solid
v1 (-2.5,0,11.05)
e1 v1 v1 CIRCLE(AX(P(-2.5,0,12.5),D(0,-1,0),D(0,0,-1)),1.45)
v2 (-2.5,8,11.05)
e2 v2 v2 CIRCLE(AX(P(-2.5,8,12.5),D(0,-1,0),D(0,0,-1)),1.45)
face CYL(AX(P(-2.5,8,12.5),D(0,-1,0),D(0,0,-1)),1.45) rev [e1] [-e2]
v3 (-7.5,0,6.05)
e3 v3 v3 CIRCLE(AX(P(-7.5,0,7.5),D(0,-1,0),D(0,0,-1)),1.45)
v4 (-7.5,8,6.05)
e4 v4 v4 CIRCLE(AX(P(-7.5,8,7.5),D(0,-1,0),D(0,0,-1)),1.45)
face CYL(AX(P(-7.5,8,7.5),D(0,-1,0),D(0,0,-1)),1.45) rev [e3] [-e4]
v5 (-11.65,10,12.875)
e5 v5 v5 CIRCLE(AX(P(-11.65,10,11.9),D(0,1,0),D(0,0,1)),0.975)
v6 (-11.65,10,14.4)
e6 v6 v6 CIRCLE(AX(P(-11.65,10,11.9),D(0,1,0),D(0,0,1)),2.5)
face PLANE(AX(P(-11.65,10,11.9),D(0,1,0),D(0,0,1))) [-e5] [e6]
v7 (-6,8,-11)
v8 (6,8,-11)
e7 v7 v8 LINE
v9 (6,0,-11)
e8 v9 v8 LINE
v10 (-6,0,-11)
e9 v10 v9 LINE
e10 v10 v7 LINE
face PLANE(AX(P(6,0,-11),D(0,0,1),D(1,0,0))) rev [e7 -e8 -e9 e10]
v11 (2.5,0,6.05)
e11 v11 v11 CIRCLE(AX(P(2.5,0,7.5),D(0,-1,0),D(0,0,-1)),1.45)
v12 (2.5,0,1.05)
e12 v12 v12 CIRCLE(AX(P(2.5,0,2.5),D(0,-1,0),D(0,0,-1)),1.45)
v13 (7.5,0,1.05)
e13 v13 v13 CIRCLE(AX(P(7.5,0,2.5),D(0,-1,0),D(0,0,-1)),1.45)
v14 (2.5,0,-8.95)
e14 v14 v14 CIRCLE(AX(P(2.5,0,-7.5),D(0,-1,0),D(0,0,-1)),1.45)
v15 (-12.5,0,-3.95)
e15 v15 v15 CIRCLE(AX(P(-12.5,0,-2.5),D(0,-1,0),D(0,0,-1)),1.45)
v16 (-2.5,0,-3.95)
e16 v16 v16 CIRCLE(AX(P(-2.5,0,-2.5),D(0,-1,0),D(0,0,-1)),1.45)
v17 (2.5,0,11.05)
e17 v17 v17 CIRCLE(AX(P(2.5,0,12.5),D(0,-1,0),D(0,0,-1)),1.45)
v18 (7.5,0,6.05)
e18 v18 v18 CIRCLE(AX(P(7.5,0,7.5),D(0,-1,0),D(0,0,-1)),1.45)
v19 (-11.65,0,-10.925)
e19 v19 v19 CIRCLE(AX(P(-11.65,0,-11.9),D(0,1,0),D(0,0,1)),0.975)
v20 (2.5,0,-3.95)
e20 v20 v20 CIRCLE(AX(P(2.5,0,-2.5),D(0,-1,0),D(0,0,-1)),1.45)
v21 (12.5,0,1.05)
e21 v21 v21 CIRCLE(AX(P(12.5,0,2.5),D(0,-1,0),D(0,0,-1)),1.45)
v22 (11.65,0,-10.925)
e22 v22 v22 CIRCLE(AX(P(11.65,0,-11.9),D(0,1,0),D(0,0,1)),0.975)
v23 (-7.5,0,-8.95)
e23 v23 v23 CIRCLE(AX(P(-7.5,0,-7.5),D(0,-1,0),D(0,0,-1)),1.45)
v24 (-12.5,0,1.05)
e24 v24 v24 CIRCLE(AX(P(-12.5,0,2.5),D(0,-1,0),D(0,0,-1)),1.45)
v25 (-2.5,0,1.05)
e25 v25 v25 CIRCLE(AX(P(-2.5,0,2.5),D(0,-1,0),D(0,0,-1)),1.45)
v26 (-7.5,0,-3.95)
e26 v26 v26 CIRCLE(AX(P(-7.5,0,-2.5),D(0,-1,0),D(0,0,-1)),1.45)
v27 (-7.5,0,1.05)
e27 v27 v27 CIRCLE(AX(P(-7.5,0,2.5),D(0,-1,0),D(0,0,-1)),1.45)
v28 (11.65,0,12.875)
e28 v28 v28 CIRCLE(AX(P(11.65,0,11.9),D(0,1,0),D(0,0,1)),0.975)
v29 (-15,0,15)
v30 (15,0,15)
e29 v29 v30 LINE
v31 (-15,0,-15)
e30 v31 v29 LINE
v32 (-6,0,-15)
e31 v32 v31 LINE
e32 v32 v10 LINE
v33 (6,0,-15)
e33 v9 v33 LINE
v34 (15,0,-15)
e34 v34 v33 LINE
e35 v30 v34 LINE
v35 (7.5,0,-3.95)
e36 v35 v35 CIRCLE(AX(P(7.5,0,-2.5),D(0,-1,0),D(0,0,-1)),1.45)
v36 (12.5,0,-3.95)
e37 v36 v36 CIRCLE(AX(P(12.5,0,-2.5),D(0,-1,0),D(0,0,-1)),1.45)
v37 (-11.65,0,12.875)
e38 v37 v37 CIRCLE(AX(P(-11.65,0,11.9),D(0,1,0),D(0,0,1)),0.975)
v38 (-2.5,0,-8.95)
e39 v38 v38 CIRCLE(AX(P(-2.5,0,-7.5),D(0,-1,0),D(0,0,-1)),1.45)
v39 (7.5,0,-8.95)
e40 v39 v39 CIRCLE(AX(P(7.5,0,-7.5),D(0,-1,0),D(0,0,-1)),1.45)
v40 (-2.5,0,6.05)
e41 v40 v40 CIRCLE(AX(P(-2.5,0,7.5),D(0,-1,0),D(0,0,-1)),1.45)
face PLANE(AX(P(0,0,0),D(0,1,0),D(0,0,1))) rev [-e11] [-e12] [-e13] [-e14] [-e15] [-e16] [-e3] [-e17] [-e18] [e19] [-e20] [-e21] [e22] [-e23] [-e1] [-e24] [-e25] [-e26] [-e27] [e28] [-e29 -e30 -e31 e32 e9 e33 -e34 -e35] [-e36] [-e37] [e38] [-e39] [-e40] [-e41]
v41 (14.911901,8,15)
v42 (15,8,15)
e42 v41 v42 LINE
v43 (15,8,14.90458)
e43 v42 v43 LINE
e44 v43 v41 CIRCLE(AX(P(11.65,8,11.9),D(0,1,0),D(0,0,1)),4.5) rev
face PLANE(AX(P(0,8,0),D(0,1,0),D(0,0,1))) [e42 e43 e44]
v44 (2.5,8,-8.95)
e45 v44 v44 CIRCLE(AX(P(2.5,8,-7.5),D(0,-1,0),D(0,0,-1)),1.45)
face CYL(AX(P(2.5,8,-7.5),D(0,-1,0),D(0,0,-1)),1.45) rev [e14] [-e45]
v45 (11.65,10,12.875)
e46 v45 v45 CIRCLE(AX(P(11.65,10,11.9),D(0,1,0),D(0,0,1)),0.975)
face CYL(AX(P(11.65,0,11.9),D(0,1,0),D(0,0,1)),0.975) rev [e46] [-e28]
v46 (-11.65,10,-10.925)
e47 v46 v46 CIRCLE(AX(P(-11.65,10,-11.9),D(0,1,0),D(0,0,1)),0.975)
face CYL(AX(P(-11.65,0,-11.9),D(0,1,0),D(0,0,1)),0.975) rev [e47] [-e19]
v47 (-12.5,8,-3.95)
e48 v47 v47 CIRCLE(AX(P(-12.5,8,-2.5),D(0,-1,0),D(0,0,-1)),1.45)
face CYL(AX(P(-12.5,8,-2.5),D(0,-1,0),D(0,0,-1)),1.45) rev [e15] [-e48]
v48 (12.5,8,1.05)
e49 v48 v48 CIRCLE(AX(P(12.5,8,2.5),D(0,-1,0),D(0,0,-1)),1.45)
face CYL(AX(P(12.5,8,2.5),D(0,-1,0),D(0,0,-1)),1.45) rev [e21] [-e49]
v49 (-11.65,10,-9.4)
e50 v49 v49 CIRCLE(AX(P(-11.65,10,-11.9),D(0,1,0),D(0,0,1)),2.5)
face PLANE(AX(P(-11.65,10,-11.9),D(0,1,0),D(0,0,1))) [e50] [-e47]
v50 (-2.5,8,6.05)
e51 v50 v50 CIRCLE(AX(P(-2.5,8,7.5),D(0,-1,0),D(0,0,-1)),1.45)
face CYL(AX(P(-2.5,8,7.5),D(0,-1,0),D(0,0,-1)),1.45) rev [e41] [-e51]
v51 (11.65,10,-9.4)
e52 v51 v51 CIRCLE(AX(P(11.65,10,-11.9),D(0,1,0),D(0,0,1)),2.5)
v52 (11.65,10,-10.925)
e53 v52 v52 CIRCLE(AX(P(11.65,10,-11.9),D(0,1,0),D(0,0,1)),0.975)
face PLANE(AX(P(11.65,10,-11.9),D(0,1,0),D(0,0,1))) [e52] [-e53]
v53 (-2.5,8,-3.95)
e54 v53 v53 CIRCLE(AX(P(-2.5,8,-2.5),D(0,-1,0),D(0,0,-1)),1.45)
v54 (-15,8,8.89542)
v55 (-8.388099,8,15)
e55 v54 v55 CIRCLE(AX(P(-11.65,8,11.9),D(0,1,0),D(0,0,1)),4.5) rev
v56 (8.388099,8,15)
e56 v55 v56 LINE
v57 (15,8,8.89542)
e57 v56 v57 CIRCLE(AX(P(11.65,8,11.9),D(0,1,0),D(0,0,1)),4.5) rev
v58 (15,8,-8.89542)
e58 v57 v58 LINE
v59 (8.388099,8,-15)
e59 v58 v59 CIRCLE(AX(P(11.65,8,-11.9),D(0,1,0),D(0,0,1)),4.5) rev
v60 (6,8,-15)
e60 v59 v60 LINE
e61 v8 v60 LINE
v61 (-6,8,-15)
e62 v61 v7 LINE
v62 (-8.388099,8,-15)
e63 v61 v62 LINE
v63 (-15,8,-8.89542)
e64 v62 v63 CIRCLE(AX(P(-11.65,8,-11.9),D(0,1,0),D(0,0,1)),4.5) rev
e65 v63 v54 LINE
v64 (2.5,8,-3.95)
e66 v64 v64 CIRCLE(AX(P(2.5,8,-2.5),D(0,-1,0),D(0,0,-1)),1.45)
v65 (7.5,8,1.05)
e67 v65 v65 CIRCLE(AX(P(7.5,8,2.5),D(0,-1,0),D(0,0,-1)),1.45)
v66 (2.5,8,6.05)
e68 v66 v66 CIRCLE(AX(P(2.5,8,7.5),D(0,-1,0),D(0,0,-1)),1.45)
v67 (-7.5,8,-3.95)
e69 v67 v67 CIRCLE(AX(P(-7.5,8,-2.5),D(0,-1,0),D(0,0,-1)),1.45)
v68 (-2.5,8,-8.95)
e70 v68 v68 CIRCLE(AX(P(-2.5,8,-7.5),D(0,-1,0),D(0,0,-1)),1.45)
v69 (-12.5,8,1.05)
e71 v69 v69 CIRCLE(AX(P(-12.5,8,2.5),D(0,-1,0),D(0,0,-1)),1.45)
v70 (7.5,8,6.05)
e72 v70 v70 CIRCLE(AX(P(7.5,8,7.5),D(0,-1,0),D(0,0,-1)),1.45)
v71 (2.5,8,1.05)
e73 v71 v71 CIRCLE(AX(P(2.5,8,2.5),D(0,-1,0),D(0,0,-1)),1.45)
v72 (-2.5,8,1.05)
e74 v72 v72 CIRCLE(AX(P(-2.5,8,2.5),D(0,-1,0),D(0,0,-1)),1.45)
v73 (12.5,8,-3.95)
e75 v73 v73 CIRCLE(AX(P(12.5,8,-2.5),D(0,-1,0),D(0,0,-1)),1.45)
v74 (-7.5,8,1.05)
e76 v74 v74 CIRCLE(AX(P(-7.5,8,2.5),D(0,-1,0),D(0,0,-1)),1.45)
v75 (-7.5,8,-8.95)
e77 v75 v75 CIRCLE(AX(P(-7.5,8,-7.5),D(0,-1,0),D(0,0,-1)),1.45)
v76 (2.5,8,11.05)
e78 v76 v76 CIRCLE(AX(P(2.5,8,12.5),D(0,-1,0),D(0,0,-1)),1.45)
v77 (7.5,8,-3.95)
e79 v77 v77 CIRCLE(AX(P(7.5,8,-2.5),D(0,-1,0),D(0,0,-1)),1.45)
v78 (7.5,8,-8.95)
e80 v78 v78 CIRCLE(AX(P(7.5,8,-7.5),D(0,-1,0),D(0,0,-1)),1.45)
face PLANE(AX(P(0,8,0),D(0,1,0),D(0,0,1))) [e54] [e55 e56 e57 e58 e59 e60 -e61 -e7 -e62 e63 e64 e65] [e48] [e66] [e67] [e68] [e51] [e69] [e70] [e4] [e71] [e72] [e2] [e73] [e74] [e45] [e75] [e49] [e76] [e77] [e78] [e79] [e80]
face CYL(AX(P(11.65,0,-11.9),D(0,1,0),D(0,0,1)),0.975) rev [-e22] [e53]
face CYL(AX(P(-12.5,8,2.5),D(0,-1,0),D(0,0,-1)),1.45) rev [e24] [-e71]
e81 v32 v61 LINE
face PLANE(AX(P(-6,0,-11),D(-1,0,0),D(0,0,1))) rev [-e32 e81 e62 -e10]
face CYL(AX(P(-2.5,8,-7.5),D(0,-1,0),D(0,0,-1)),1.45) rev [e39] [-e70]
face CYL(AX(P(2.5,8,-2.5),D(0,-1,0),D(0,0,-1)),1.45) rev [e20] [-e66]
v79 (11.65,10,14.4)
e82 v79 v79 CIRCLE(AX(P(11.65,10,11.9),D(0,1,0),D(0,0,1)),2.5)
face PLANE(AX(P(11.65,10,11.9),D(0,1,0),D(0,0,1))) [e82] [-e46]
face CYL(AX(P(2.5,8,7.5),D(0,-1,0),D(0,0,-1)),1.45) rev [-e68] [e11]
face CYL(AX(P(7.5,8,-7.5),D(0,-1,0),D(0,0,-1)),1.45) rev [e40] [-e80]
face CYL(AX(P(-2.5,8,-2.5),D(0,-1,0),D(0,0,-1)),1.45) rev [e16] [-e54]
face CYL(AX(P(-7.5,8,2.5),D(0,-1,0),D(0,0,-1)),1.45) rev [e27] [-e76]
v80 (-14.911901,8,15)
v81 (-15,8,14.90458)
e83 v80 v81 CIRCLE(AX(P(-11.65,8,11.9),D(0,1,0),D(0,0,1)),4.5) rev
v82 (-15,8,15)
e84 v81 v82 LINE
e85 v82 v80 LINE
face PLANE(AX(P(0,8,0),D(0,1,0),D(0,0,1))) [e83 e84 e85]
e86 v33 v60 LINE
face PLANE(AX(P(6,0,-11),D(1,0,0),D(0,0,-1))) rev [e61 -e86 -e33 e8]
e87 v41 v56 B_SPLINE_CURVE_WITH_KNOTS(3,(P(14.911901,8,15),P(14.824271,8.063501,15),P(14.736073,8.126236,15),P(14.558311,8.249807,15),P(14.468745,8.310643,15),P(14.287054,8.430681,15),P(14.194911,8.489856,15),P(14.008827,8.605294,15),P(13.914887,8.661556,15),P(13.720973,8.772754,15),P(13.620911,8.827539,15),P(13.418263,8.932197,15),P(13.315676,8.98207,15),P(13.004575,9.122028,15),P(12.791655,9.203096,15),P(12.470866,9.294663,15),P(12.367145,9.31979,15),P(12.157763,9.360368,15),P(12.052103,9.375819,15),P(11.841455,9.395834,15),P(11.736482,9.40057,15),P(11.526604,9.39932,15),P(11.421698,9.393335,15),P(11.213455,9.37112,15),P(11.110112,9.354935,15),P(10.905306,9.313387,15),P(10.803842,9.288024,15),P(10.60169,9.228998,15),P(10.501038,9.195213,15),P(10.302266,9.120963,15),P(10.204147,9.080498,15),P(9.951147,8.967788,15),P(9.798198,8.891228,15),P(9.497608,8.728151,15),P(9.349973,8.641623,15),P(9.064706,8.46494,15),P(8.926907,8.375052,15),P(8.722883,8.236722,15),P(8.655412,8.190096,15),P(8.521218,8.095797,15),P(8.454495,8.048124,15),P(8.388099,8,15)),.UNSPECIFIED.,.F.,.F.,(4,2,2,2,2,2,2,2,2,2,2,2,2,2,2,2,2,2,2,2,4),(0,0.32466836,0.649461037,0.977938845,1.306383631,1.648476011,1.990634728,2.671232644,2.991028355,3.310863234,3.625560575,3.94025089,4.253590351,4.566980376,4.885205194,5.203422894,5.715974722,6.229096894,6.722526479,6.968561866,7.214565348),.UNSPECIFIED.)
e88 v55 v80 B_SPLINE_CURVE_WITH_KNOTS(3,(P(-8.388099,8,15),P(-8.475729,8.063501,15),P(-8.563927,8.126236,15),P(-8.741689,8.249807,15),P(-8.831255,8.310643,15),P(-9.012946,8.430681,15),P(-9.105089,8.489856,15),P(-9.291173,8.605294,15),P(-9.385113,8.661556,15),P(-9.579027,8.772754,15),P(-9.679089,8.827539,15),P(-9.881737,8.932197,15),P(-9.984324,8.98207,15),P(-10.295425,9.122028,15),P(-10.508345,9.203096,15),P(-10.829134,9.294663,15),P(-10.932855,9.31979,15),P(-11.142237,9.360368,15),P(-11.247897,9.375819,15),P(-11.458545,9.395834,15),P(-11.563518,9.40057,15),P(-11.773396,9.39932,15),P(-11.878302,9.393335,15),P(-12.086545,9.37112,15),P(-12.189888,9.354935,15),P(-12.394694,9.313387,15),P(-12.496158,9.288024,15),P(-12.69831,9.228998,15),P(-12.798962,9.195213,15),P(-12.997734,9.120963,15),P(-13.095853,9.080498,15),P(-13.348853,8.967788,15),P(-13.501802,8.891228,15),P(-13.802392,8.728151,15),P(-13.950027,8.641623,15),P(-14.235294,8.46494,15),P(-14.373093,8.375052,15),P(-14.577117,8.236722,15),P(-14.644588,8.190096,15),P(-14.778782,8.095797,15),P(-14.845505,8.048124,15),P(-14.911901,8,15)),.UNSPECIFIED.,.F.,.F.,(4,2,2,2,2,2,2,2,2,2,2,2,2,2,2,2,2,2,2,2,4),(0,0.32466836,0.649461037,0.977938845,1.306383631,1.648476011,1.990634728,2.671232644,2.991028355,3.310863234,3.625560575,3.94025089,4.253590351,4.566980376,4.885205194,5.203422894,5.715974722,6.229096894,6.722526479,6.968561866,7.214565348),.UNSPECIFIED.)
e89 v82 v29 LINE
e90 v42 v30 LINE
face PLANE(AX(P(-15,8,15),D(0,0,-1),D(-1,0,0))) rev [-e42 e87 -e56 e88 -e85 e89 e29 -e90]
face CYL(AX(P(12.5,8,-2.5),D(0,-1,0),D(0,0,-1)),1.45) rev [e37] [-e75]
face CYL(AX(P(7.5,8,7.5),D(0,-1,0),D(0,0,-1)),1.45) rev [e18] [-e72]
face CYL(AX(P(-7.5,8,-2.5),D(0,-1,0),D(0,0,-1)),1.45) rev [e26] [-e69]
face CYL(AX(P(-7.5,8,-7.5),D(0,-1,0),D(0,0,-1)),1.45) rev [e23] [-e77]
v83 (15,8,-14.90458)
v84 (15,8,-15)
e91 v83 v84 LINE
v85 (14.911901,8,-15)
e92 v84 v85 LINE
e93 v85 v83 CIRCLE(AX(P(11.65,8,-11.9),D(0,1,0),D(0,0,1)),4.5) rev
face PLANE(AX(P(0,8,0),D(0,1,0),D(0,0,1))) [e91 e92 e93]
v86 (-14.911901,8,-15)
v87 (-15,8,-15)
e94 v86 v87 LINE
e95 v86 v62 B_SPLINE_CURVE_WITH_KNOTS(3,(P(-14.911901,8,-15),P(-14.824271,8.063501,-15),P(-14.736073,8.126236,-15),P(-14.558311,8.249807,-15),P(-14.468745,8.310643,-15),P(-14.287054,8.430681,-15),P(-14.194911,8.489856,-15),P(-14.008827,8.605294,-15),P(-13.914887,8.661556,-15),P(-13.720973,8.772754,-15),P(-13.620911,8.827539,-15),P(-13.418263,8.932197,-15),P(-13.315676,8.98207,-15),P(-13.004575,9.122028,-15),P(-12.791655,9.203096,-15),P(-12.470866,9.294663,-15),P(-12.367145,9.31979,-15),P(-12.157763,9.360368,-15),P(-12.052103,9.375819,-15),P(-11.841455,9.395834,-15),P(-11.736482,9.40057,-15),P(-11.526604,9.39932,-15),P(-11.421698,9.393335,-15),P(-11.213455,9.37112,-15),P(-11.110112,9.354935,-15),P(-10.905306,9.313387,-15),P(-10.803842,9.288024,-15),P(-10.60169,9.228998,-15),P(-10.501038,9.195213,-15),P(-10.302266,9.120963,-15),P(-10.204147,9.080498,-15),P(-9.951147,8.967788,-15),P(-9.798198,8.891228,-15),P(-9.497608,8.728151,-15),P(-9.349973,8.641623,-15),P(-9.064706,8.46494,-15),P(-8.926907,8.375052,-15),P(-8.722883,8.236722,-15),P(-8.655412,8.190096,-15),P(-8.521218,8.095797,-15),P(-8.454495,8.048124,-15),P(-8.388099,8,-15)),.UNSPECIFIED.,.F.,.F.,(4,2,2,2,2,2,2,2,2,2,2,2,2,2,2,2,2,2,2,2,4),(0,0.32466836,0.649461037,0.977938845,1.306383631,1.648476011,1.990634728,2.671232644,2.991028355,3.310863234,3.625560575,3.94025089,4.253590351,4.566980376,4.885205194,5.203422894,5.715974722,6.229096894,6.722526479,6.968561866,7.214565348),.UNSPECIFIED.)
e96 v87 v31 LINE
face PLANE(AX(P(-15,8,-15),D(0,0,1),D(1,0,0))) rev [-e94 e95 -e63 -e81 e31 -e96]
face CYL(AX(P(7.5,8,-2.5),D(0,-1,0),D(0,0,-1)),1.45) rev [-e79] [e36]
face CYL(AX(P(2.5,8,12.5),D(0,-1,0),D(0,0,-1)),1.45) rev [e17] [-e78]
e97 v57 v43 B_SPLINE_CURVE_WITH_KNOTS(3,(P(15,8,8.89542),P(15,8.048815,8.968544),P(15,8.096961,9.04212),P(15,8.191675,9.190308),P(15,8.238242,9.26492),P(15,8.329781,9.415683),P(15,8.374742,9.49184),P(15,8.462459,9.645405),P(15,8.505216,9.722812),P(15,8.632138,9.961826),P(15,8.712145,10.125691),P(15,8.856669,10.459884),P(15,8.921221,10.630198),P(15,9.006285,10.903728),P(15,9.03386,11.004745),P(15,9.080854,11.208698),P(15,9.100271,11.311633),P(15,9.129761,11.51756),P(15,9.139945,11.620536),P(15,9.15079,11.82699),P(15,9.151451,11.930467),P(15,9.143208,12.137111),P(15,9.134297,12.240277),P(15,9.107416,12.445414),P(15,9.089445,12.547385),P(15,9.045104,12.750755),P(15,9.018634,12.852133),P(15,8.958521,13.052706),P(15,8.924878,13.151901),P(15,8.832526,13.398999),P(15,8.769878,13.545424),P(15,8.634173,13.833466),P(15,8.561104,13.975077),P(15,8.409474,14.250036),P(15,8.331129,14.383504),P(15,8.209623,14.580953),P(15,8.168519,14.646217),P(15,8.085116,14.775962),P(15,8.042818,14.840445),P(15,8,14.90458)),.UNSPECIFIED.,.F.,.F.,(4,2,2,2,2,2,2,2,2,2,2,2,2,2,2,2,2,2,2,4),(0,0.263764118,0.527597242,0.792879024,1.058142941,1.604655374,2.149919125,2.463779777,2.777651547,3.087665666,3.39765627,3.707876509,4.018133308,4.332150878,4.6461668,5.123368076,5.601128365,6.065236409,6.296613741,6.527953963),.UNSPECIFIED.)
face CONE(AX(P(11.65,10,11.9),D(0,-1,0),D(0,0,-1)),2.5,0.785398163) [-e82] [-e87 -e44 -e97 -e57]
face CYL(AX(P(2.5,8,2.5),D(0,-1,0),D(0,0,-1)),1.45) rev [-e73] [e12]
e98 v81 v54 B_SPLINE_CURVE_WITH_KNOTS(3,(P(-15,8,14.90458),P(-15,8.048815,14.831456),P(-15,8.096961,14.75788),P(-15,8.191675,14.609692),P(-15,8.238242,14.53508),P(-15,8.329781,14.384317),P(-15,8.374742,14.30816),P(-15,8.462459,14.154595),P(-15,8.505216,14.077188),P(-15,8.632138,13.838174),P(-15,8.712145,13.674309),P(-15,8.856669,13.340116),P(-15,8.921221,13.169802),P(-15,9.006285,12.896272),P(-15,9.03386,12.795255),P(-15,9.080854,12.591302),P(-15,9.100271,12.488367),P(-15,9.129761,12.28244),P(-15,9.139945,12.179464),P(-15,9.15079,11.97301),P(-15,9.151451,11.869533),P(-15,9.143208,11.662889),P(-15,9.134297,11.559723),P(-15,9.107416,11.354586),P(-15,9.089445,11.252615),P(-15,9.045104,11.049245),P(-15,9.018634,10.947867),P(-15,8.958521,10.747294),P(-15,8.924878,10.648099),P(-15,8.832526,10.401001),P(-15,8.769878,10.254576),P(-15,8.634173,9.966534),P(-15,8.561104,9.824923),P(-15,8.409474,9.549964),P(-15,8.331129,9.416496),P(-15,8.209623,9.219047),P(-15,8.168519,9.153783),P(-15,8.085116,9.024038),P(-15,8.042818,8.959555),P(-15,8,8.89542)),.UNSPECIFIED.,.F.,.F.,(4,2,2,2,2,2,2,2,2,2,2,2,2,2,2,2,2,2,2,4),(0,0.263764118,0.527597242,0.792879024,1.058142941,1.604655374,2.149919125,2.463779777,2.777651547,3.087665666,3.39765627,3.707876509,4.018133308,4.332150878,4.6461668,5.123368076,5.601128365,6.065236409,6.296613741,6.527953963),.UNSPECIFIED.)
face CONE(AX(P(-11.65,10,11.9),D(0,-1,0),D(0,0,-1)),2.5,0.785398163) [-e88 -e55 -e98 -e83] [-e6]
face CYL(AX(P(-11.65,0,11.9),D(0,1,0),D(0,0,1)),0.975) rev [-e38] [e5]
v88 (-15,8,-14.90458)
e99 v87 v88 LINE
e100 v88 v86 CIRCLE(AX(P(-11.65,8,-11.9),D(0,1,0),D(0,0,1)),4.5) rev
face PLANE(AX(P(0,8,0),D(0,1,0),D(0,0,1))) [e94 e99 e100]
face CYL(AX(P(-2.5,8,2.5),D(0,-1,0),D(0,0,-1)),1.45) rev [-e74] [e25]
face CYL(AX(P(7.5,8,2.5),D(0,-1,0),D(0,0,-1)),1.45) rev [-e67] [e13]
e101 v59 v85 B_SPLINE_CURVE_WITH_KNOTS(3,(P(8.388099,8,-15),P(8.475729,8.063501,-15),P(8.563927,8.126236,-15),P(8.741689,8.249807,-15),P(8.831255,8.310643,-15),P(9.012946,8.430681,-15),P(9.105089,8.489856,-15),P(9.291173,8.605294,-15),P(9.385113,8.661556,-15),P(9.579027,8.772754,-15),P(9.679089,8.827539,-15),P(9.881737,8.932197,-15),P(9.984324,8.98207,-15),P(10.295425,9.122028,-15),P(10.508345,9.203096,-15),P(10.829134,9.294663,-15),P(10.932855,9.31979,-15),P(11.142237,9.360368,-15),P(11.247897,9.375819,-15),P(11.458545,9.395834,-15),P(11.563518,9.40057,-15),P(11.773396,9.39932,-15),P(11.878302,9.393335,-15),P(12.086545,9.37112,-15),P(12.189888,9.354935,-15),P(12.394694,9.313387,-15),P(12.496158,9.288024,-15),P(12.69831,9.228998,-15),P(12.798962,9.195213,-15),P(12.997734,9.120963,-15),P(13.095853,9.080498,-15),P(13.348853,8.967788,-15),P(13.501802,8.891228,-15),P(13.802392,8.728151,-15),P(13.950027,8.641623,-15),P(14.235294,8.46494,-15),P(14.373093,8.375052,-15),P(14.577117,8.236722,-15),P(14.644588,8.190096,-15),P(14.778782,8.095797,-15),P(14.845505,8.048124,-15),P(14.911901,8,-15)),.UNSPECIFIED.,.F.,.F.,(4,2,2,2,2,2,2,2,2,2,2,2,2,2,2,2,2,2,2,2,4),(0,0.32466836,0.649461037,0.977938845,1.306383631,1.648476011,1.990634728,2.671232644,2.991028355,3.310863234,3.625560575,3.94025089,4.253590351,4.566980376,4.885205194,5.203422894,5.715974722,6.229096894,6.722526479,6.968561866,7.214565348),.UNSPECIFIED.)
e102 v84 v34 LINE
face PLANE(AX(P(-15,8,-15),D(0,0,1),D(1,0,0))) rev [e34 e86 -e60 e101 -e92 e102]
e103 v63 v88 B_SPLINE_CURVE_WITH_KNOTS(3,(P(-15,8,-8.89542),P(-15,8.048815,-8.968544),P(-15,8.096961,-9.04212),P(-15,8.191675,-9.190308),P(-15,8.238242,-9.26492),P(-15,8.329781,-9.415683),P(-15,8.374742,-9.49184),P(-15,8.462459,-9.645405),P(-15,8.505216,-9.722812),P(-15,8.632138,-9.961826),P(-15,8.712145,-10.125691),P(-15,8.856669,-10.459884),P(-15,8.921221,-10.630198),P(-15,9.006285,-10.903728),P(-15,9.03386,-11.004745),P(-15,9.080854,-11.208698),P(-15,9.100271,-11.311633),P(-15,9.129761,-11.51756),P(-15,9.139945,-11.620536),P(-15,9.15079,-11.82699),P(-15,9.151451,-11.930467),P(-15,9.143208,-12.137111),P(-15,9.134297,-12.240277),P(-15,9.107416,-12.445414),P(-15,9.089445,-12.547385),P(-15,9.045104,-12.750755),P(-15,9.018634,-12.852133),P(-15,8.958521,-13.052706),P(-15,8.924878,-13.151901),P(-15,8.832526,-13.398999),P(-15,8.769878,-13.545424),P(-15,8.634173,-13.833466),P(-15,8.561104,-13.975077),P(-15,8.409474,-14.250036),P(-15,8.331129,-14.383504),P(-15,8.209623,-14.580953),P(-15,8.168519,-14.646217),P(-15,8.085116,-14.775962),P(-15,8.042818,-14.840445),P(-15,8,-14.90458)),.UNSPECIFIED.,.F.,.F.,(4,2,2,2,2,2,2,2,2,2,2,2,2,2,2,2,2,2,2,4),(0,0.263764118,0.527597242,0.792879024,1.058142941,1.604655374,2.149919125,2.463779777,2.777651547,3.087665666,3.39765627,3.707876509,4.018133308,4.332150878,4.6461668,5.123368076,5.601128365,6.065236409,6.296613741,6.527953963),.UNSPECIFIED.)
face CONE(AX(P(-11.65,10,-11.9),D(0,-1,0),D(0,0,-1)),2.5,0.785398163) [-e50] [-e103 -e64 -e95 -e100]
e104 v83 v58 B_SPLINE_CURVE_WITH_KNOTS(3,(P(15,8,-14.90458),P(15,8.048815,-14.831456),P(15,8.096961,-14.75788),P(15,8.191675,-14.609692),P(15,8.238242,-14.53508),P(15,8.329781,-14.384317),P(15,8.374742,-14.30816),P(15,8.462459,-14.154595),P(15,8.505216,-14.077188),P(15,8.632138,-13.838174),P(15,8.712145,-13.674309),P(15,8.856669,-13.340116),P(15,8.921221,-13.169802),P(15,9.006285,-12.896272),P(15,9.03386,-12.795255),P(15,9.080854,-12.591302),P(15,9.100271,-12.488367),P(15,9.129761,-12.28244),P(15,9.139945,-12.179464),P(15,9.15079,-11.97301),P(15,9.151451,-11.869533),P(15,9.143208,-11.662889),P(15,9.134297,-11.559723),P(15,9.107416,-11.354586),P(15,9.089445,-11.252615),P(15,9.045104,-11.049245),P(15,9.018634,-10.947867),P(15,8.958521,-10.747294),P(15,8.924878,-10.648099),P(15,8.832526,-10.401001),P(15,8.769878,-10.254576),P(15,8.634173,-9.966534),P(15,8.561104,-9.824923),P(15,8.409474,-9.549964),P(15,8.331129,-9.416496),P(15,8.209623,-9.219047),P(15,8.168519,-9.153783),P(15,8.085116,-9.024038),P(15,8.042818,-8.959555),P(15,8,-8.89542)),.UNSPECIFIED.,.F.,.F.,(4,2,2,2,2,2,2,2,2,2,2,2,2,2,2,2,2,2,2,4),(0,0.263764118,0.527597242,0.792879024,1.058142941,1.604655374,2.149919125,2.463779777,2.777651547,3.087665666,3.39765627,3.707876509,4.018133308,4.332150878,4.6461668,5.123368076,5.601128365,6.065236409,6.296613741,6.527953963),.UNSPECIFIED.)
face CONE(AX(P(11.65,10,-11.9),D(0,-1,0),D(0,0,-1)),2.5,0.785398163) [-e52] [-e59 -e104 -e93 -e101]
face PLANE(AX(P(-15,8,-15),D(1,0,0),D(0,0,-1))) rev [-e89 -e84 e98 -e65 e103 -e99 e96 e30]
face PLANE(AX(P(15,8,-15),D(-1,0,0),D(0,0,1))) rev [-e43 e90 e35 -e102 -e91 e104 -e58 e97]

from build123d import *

# Parameters (mm, degrees)
SKETCH1_W                = 30
SKETCH1_H                = 30
BOSS_EXTRUDE1_DEPTH      = 8
SKETCH5_R                = 1.45
CUT_EXTRUDE3_DEPTH       = 23.671568098
LPATTERN1_COUNT          = 6
LPATTERN1_PITCH          = 5
LPATTERN1_COUNT_DIR2     = 6
LPATTERN1_PITCH_DIR2     = 5
BOSS_EXTRUDE2_DEPTH      = 2
BOSS_EXTRUDE2_DEPTH_BACK = 8
SKETCH2_R                = 2.5
SKETCH3_R                = 0.975
CUT_EXTRUDE1_DEPTH       = 24.452078799
SKETCH4_W                = 12
SKETCH4_H                = 4
CUT_EXTRUDE2_DEPTH       = 23.671568098
CHAMFER1_SIZE            = 2


with BuildPart() as part:
    # Sketch1 → Boss-Extrude1 (new body)
    with BuildSketch(Plane(origin=(0, 0, 0), x_dir=(1, 0, 0), z_dir=(0, 1, 0))):
        Rectangle(SKETCH1_W, SKETCH1_H)
    extrude(amount=BOSS_EXTRUDE1_DEPTH)

    # Sketch5 → Cut-Extrude3 (cut, through all)
    with BuildSketch(Plane.XZ):
        with Locations(Location((-12.5, 12.5, 0), (0, 0, 270))):
            Circle(SKETCH5_R)
    cut_extrude3 = extrude(amount=-CUT_EXTRUDE3_DEPTH, mode=Mode.SUBTRACT)

    # LPattern1: Cut-Extrude3 6 × 6, 10 skipped
    with Locations(*[(i * LPATTERN1_PITCH, 0, -j * LPATTERN1_PITCH_DIR2) for i in range(LPATTERN1_COUNT) for j in range(LPATTERN1_COUNT_DIR2) if (i, j) not in ((0, 0), (0, 1), (0, 4), (1, 0), (1, 5), (2, 5), (3, 5), (4, 0), (4, 5), (5, 1), (5, 4))]):
        add(cut_extrude3, mode=Mode.SUBTRACT)

    # Sketch2 → Boss-Extrude2 (add, two sides: drawn at the far end of the back side and taken through both)
    with BuildSketch(Plane(origin=(0, 8, 0), x_dir=(1, 0, 0), z_dir=(0, 1, 0)).offset(-BOSS_EXTRUDE2_DEPTH_BACK)):
        with Locations(Location((-11.65, 11.9, 0), (0, 0, 270))):
            Circle(SKETCH2_R)
        with Locations(Location((11.65, 11.9, 0), (0, 0, 270))):
            Circle(SKETCH2_R)
        with Locations(Location((11.65, -11.9, 0), (0, 0, 270))):
            Circle(SKETCH2_R)
        with Locations(Location((-11.65, -11.9, 0), (0, 0, 270))):
            Circle(SKETCH2_R)
    extrude(amount=BOSS_EXTRUDE2_DEPTH + BOSS_EXTRUDE2_DEPTH_BACK)

    # Sketch3 → Cut-Extrude1 (cut, through all)
    with BuildSketch(Plane(origin=(0, 10, 0), x_dir=(1, 0, 0), z_dir=(0, 1, 0))):
        with Locations(Location((-11.65, 11.9, 0), (0, 0, 270))):
            Circle(SKETCH3_R)
        with Locations(Location((11.65, 11.9, 0), (0, 0, 270))):
            Circle(SKETCH3_R)
        with Locations(Location((-11.65, -11.9, 0), (0, 0, 270))):
            Circle(SKETCH3_R)
        with Locations(Location((11.65, -11.9, 0), (0, 0, 270))):
            Circle(SKETCH3_R)
    extrude(amount=-CUT_EXTRUDE1_DEPTH, mode=Mode.SUBTRACT)

    # Sketch4 → Cut-Extrude2 (cut, through all)
    with BuildSketch(Plane(origin=(0, 8, 0), x_dir=(1, 0, 0), z_dir=(0, 1, 0))):
        with Locations((0, 13)):
            Rectangle(SKETCH4_W, SKETCH4_H)
    extrude(amount=-CUT_EXTRUDE2_DEPTH, mode=Mode.SUBTRACT)

    # Chamfer1
    # the kernel refuses this chamfer: 2 mm, written as the material it adds along each edge
    with BuildSketch(Plane(origin=(-11.65, 8, -11.9), x_dir=(0, 0, 1), z_dir=(-1, 0, 0))) as chamfer1_piece_1_section:
        Polygon((2.5 + CHAMFER1_SIZE, 0), (2.5, CHAMFER1_SIZE), (2.5, 0), align=None)
    chamfer1_piece_1 = revolve(axis=Axis((-11.65, 8, -11.9), (0, 1, 0)), mode=Mode.PRIVATE)
    chamfer1_piece_1 = split(chamfer1_piece_1, bisect_by=Plane(origin=(-8.021209726, 8.262551845, -15), z_dir=(0, 0, 1)), keep=Keep.TOP, mode=Mode.PRIVATE)
    chamfer1_piece_1 = split(chamfer1_piece_1, bisect_by=Plane(origin=(-15, 8.262551845, -9.804916959), z_dir=(1, 0, 0)), keep=Keep.TOP, mode=Mode.PRIVATE)
    chamfer1_piece_1 = split(chamfer1_piece_1, bisect_by=Plane(origin=(-8.021209726, 10, -9.804916959), z_dir=(0, -1, 0)), keep=Keep.TOP, mode=Mode.PRIVATE)
    add(chamfer1_piece_1)
    with BuildSketch(Plane(origin=(11.65, 8, -11.9), x_dir=(0, 0, 1), z_dir=(-1, 0, 0))) as chamfer1_piece_2_section:
        Polygon((2.5 + CHAMFER1_SIZE, 0), (2.5, CHAMFER1_SIZE), (2.5, 0), align=None)
    chamfer1_piece_2 = revolve(axis=Axis((11.65, 8, -11.9), (0, 1, 0)), mode=Mode.PRIVATE)
    chamfer1_piece_2 = split(chamfer1_piece_2, bisect_by=Plane(origin=(15, 8.948074694, -10.147678382), z_dir=(-1, 0, 0)), keep=Keep.TOP, mode=Mode.PRIVATE)
    chamfer1_piece_2 = split(chamfer1_piece_2, bisect_by=Plane(origin=(14.685110074, 8.948074694, -15), z_dir=(0, 0, 1)), keep=Keep.TOP, mode=Mode.PRIVATE)
    chamfer1_piece_2 = split(chamfer1_piece_2, bisect_by=Plane(origin=(14.685110074, 10, -10.147678382), z_dir=(0, -1, 0)), keep=Keep.TOP, mode=Mode.PRIVATE)
    add(chamfer1_piece_2)
    with BuildSketch(Plane(origin=(11.65, 8, 11.9), x_dir=(0, 0, 1), z_dir=(-1, 0, 0))) as chamfer1_piece_3_section:
        Polygon((2.5 + CHAMFER1_SIZE, 0), (2.5, CHAMFER1_SIZE), (2.5, 0), align=None)
    chamfer1_piece_3 = revolve(axis=Axis((11.65, 8, 11.9), (0, 1, 0)), mode=Mode.PRIVATE)
    chamfer1_piece_3 = split(chamfer1_piece_3, bisect_by=Plane(origin=(11.65, 8.948074692, 15), z_dir=(0, 0, -1)), keep=Keep.TOP, mode=Mode.PRIVATE)
    chamfer1_piece_3 = split(chamfer1_piece_3, bisect_by=Plane(origin=(15, 8.948074692, 8.395356766), z_dir=(-1, 0, 0)), keep=Keep.TOP, mode=Mode.PRIVATE)
    chamfer1_piece_3 = split(chamfer1_piece_3, bisect_by=Plane(origin=(11.65, 10, 8.395356766), z_dir=(0, -1, 0)), keep=Keep.TOP, mode=Mode.PRIVATE)
    add(chamfer1_piece_3)
    with BuildSketch(Plane(origin=(-11.65, 8, 11.9), x_dir=(0, 0, 1), z_dir=(-1, 0, 0))) as chamfer1_piece_4_section:
        Polygon((2.5 + CHAMFER1_SIZE, 0), (2.5, CHAMFER1_SIZE), (2.5, 0), align=None)
    chamfer1_piece_4 = revolve(axis=Axis((-11.65, 8, 11.9), (0, 1, 0)), mode=Mode.PRIVATE)
    chamfer1_piece_4 = split(chamfer1_piece_4, bisect_by=Plane(origin=(-15, 8.948074692, 8.395356766), z_dir=(1, 0, 0)), keep=Keep.TOP, mode=Mode.PRIVATE)
    chamfer1_piece_4 = split(chamfer1_piece_4, bisect_by=Plane(origin=(-11.65, 8.948074692, 15), z_dir=(0, 0, -1)), keep=Keep.TOP, mode=Mode.PRIVATE)
    chamfer1_piece_4 = split(chamfer1_piece_4, bisect_by=Plane(origin=(-11.65, 10, 8.395356766), z_dir=(0, -1, 0)), keep=Keep.TOP, mode=Mode.PRIVATE)
    add(chamfer1_piece_4)


solid = part.part
